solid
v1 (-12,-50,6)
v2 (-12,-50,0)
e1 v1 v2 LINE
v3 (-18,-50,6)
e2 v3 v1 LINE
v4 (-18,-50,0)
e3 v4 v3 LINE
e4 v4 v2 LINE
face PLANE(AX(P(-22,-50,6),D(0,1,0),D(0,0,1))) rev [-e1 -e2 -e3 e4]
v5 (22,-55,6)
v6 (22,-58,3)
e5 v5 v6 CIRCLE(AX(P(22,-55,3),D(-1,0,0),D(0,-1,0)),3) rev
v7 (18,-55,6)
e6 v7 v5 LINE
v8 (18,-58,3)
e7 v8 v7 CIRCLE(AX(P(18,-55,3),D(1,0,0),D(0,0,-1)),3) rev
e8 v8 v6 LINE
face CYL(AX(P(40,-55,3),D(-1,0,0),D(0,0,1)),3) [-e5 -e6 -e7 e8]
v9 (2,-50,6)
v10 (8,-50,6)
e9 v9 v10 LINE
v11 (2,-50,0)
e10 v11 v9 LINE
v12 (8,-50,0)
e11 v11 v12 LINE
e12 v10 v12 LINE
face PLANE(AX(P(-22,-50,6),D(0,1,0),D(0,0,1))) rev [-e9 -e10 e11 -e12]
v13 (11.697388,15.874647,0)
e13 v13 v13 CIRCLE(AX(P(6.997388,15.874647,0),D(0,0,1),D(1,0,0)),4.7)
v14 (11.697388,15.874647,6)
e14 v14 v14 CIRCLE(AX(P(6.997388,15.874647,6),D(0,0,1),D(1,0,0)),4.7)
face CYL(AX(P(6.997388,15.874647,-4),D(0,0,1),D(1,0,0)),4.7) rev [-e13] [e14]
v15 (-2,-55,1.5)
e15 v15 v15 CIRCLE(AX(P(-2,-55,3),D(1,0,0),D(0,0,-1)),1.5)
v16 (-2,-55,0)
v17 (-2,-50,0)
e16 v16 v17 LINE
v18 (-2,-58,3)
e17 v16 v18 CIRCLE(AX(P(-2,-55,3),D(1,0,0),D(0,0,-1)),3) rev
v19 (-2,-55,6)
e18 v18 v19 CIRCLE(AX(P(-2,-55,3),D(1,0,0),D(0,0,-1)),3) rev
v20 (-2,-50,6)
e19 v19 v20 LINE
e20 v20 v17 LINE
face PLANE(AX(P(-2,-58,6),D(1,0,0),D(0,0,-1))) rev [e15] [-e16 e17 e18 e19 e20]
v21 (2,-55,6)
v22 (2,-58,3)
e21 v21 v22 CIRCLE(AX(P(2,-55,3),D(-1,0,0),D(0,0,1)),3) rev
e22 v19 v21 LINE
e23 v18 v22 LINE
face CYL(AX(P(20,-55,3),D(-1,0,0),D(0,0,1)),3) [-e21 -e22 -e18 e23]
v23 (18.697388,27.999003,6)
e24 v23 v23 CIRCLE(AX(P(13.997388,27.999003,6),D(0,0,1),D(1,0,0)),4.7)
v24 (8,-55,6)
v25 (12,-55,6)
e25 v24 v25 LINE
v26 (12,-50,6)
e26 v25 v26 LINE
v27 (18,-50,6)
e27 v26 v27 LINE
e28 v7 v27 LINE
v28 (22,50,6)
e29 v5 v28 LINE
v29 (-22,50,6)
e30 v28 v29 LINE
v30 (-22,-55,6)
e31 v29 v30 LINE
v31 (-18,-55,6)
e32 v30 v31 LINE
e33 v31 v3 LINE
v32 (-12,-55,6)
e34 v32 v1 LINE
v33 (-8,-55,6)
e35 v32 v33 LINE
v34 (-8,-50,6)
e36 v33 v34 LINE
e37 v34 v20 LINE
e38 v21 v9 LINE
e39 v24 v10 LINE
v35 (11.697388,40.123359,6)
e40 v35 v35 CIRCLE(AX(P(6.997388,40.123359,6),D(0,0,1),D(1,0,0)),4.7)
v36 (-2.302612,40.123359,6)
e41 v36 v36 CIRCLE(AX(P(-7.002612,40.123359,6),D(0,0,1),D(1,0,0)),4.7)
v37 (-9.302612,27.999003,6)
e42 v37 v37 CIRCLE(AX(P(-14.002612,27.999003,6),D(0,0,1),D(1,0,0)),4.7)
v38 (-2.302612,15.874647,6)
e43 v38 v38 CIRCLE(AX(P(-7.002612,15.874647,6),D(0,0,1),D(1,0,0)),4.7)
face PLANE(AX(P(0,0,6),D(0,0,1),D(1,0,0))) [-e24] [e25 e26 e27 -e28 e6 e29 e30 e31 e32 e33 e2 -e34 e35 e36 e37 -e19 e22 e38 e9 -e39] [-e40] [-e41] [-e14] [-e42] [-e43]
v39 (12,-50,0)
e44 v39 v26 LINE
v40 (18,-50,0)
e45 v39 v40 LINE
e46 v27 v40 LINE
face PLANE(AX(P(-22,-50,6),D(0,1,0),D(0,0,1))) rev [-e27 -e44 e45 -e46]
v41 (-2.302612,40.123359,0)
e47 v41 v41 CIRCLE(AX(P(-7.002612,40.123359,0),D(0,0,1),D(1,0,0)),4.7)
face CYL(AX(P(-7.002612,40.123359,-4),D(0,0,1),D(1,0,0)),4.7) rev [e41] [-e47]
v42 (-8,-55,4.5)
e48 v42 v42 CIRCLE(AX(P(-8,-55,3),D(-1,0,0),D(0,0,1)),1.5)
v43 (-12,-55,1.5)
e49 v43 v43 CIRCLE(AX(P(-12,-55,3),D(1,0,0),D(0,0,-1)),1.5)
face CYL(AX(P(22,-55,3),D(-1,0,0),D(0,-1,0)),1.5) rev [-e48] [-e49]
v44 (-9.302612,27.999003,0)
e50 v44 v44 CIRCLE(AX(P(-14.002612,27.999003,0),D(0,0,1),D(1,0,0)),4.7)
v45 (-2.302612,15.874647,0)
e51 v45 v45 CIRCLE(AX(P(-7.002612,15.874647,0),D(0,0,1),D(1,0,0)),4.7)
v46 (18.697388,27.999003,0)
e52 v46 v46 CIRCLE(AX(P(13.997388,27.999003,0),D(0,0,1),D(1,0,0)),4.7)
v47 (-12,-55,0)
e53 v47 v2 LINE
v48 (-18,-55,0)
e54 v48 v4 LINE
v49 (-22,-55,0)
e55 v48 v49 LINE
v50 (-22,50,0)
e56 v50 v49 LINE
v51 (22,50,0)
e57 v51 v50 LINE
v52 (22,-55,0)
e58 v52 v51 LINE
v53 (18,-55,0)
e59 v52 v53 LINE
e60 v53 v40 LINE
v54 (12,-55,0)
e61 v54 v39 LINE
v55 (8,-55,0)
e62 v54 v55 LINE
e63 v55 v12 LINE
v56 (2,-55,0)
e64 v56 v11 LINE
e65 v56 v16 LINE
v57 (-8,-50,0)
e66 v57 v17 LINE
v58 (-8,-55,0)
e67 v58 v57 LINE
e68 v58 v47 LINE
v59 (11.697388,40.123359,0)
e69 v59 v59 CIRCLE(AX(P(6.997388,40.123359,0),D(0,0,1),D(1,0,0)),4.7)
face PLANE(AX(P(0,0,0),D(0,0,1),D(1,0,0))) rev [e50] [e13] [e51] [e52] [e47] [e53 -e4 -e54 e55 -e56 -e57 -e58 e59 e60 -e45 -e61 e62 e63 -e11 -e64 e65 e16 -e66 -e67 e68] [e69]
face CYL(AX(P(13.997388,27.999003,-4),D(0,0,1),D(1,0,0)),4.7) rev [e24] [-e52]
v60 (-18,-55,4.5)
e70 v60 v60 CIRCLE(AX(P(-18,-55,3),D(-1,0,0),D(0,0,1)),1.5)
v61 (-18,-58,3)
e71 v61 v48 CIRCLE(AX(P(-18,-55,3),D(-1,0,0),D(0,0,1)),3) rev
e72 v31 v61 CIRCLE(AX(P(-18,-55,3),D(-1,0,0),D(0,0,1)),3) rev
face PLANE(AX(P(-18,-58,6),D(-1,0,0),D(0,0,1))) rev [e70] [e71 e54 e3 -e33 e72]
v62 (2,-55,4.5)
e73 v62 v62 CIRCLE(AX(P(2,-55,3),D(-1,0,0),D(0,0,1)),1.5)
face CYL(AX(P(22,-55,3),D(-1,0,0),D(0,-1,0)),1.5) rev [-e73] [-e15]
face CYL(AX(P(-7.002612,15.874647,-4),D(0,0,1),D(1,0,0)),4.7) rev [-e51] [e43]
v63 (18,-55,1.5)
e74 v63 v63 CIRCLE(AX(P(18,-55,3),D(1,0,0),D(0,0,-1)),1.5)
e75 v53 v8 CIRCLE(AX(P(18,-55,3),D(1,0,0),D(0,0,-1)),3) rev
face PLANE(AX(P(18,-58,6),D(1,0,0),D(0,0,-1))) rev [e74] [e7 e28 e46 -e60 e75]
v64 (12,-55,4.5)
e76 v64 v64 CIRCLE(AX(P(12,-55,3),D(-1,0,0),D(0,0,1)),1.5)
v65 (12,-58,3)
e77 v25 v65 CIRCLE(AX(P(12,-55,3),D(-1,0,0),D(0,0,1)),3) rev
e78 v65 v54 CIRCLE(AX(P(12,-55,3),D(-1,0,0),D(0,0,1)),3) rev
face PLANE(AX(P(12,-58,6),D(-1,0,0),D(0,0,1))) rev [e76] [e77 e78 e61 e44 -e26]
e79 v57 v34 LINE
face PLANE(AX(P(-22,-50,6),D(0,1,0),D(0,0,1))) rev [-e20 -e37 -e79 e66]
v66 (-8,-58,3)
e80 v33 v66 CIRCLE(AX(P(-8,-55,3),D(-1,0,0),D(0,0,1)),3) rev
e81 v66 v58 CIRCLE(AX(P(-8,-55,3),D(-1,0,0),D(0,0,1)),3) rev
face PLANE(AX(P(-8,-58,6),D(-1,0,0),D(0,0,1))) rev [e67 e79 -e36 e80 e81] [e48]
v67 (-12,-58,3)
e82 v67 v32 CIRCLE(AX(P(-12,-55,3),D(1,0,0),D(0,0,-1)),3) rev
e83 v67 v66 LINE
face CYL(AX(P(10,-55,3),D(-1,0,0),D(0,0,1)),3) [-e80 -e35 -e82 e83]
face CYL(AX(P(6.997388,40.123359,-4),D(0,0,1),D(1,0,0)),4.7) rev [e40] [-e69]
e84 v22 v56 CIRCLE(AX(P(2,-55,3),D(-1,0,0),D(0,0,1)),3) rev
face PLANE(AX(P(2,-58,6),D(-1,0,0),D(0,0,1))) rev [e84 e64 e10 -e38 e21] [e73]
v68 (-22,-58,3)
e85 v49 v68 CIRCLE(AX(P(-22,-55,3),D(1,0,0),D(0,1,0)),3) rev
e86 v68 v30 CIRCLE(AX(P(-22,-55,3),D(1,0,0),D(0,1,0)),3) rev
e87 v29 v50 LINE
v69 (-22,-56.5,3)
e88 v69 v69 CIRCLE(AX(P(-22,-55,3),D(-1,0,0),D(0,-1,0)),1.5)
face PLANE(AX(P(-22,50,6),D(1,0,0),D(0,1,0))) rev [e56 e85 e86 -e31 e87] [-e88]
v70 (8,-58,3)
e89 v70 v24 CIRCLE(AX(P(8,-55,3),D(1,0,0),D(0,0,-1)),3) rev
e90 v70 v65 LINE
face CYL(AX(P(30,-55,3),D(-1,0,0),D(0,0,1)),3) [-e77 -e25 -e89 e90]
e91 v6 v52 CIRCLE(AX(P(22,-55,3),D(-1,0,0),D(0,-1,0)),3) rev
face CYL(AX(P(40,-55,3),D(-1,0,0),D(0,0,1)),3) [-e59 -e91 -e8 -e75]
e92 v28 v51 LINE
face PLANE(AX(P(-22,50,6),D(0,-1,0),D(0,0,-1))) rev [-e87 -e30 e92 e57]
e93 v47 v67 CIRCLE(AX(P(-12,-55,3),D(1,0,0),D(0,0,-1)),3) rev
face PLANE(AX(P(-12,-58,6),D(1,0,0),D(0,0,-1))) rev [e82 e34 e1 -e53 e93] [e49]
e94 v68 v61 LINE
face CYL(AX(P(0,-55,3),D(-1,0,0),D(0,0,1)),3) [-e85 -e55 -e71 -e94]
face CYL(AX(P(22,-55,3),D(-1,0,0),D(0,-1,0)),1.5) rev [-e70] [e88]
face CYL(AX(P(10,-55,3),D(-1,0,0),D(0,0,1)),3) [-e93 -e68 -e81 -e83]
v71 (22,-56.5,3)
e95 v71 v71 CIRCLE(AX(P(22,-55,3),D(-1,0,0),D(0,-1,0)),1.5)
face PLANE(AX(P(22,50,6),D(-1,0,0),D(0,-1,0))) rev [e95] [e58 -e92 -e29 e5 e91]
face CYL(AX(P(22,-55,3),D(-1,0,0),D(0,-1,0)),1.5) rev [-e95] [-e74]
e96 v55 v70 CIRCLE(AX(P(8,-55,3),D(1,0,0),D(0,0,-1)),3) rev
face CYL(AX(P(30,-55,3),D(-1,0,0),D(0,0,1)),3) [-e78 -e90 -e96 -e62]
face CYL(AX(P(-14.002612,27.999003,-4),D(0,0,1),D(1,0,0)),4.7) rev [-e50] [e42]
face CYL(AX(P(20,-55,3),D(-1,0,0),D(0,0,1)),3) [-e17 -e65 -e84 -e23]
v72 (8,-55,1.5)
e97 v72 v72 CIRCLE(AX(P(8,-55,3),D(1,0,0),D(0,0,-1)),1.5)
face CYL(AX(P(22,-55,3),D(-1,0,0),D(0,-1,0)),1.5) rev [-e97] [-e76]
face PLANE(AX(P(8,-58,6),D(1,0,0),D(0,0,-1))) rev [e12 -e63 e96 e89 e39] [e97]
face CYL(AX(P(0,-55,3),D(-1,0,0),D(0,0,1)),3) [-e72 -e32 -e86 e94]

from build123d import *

# Parameters (mm, degrees)
SKETCH1_W              = 44
SKETCH1_H              = 100
BOSS_EXTRUDE1_DEPTH    = 6
SKETCH3_R              = 4.7
CUT_EXTRUDE4_DEPTH     = 10
SKETCH4_W              = 4
SKETCH4_H              = 6
BOSS_EXTRUDE2_DEPTH    = 8
FILLET1_R              = 3
LPATTERN1_COUNT        = 5
LPATTERN1_PITCH        = 10
FILLET1_OF_LPATTERN1_R = 3
SKETCH5_R              = 1.5
CUT_EXTRUDE5_DEPTH     = 74.047929471


with BuildPart() as part:
    # Sketch1 → Boss-Extrude1 (new body)
    with BuildSketch(Plane.XY):
        Rectangle(SKETCH1_W, SKETCH1_H)
    extrude(amount=BOSS_EXTRUDE1_DEPTH)

    # Sketch3 → Cut-Extrude4 (cut)
    with BuildSketch(Plane.XY.offset(6)):
        with Locations((-7.002612265, 40.123358619)):
            Circle(SKETCH3_R)
        with Locations((6.997387735, 40.123358619)):
            Circle(SKETCH3_R)
        with Locations((13.997387735, 27.999002966)):
            Circle(SKETCH3_R)
        with Locations((6.997387735, 15.874647313)):
            Circle(SKETCH3_R)
        with Locations((-7.002612265, 15.874647313)):
            Circle(SKETCH3_R)
        with Locations((-14.002612265, 27.999002966)):
            Circle(SKETCH3_R)
    extrude(amount=-CUT_EXTRUDE4_DEPTH, mode=Mode.SUBTRACT)

    # Sketch4 → Boss-Extrude2 (add)
    with BuildSketch(Plane.XZ.offset(50)):
        with Locations((-20, 3)):
            Rectangle(SKETCH4_W, SKETCH4_H)
    boss_extrude2 = extrude(amount=BOSS_EXTRUDE2_DEPTH)

    # Fillet1
    fillet1_edges = [part.edges().sort_by_distance(p)[0] for p in [
        (-20, -58, 6),
        (-20, -58, 0),
    ]]
    fillet(fillet1_edges, radius=FILLET1_R - 0.0001)  # a hair under: the kernel refuses the full size

    # LPattern1: Boss-Extrude2 ×5
    with Locations(*[(i * LPATTERN1_PITCH, 0, 0) for i in range(1, LPATTERN1_COUNT)]):
        add(boss_extrude2)

    # Fillet1 of LPattern1
    fillet1_of_lpattern1_edges = [part.edges().sort_by_distance(p)[0] for p in [
        (-10, -58, 6),
        (-10, -58, 0),
        (0, -58, 6),
        (0, -58, 0),
        (10, -58, 6),
        (10, -58, 0),
        (20, -58, 6),
        (20, -58, 0),
    ]]
    fillet(fillet1_of_lpattern1_edges, radius=FILLET1_OF_LPATTERN1_R - 0.0001)  # a hair under: the kernel refuses the full size

    # Sketch5 → Cut-Extrude5 (cut, through all)
    with BuildSketch(Plane.ZY.offset(22)):
        with Locations(Location((3, -55, 0), (0, 0, 270))):
            Circle(SKETCH5_R)
    extrude(amount=-CUT_EXTRUDE5_DEPTH, mode=Mode.SUBTRACT)


solid = part.part
